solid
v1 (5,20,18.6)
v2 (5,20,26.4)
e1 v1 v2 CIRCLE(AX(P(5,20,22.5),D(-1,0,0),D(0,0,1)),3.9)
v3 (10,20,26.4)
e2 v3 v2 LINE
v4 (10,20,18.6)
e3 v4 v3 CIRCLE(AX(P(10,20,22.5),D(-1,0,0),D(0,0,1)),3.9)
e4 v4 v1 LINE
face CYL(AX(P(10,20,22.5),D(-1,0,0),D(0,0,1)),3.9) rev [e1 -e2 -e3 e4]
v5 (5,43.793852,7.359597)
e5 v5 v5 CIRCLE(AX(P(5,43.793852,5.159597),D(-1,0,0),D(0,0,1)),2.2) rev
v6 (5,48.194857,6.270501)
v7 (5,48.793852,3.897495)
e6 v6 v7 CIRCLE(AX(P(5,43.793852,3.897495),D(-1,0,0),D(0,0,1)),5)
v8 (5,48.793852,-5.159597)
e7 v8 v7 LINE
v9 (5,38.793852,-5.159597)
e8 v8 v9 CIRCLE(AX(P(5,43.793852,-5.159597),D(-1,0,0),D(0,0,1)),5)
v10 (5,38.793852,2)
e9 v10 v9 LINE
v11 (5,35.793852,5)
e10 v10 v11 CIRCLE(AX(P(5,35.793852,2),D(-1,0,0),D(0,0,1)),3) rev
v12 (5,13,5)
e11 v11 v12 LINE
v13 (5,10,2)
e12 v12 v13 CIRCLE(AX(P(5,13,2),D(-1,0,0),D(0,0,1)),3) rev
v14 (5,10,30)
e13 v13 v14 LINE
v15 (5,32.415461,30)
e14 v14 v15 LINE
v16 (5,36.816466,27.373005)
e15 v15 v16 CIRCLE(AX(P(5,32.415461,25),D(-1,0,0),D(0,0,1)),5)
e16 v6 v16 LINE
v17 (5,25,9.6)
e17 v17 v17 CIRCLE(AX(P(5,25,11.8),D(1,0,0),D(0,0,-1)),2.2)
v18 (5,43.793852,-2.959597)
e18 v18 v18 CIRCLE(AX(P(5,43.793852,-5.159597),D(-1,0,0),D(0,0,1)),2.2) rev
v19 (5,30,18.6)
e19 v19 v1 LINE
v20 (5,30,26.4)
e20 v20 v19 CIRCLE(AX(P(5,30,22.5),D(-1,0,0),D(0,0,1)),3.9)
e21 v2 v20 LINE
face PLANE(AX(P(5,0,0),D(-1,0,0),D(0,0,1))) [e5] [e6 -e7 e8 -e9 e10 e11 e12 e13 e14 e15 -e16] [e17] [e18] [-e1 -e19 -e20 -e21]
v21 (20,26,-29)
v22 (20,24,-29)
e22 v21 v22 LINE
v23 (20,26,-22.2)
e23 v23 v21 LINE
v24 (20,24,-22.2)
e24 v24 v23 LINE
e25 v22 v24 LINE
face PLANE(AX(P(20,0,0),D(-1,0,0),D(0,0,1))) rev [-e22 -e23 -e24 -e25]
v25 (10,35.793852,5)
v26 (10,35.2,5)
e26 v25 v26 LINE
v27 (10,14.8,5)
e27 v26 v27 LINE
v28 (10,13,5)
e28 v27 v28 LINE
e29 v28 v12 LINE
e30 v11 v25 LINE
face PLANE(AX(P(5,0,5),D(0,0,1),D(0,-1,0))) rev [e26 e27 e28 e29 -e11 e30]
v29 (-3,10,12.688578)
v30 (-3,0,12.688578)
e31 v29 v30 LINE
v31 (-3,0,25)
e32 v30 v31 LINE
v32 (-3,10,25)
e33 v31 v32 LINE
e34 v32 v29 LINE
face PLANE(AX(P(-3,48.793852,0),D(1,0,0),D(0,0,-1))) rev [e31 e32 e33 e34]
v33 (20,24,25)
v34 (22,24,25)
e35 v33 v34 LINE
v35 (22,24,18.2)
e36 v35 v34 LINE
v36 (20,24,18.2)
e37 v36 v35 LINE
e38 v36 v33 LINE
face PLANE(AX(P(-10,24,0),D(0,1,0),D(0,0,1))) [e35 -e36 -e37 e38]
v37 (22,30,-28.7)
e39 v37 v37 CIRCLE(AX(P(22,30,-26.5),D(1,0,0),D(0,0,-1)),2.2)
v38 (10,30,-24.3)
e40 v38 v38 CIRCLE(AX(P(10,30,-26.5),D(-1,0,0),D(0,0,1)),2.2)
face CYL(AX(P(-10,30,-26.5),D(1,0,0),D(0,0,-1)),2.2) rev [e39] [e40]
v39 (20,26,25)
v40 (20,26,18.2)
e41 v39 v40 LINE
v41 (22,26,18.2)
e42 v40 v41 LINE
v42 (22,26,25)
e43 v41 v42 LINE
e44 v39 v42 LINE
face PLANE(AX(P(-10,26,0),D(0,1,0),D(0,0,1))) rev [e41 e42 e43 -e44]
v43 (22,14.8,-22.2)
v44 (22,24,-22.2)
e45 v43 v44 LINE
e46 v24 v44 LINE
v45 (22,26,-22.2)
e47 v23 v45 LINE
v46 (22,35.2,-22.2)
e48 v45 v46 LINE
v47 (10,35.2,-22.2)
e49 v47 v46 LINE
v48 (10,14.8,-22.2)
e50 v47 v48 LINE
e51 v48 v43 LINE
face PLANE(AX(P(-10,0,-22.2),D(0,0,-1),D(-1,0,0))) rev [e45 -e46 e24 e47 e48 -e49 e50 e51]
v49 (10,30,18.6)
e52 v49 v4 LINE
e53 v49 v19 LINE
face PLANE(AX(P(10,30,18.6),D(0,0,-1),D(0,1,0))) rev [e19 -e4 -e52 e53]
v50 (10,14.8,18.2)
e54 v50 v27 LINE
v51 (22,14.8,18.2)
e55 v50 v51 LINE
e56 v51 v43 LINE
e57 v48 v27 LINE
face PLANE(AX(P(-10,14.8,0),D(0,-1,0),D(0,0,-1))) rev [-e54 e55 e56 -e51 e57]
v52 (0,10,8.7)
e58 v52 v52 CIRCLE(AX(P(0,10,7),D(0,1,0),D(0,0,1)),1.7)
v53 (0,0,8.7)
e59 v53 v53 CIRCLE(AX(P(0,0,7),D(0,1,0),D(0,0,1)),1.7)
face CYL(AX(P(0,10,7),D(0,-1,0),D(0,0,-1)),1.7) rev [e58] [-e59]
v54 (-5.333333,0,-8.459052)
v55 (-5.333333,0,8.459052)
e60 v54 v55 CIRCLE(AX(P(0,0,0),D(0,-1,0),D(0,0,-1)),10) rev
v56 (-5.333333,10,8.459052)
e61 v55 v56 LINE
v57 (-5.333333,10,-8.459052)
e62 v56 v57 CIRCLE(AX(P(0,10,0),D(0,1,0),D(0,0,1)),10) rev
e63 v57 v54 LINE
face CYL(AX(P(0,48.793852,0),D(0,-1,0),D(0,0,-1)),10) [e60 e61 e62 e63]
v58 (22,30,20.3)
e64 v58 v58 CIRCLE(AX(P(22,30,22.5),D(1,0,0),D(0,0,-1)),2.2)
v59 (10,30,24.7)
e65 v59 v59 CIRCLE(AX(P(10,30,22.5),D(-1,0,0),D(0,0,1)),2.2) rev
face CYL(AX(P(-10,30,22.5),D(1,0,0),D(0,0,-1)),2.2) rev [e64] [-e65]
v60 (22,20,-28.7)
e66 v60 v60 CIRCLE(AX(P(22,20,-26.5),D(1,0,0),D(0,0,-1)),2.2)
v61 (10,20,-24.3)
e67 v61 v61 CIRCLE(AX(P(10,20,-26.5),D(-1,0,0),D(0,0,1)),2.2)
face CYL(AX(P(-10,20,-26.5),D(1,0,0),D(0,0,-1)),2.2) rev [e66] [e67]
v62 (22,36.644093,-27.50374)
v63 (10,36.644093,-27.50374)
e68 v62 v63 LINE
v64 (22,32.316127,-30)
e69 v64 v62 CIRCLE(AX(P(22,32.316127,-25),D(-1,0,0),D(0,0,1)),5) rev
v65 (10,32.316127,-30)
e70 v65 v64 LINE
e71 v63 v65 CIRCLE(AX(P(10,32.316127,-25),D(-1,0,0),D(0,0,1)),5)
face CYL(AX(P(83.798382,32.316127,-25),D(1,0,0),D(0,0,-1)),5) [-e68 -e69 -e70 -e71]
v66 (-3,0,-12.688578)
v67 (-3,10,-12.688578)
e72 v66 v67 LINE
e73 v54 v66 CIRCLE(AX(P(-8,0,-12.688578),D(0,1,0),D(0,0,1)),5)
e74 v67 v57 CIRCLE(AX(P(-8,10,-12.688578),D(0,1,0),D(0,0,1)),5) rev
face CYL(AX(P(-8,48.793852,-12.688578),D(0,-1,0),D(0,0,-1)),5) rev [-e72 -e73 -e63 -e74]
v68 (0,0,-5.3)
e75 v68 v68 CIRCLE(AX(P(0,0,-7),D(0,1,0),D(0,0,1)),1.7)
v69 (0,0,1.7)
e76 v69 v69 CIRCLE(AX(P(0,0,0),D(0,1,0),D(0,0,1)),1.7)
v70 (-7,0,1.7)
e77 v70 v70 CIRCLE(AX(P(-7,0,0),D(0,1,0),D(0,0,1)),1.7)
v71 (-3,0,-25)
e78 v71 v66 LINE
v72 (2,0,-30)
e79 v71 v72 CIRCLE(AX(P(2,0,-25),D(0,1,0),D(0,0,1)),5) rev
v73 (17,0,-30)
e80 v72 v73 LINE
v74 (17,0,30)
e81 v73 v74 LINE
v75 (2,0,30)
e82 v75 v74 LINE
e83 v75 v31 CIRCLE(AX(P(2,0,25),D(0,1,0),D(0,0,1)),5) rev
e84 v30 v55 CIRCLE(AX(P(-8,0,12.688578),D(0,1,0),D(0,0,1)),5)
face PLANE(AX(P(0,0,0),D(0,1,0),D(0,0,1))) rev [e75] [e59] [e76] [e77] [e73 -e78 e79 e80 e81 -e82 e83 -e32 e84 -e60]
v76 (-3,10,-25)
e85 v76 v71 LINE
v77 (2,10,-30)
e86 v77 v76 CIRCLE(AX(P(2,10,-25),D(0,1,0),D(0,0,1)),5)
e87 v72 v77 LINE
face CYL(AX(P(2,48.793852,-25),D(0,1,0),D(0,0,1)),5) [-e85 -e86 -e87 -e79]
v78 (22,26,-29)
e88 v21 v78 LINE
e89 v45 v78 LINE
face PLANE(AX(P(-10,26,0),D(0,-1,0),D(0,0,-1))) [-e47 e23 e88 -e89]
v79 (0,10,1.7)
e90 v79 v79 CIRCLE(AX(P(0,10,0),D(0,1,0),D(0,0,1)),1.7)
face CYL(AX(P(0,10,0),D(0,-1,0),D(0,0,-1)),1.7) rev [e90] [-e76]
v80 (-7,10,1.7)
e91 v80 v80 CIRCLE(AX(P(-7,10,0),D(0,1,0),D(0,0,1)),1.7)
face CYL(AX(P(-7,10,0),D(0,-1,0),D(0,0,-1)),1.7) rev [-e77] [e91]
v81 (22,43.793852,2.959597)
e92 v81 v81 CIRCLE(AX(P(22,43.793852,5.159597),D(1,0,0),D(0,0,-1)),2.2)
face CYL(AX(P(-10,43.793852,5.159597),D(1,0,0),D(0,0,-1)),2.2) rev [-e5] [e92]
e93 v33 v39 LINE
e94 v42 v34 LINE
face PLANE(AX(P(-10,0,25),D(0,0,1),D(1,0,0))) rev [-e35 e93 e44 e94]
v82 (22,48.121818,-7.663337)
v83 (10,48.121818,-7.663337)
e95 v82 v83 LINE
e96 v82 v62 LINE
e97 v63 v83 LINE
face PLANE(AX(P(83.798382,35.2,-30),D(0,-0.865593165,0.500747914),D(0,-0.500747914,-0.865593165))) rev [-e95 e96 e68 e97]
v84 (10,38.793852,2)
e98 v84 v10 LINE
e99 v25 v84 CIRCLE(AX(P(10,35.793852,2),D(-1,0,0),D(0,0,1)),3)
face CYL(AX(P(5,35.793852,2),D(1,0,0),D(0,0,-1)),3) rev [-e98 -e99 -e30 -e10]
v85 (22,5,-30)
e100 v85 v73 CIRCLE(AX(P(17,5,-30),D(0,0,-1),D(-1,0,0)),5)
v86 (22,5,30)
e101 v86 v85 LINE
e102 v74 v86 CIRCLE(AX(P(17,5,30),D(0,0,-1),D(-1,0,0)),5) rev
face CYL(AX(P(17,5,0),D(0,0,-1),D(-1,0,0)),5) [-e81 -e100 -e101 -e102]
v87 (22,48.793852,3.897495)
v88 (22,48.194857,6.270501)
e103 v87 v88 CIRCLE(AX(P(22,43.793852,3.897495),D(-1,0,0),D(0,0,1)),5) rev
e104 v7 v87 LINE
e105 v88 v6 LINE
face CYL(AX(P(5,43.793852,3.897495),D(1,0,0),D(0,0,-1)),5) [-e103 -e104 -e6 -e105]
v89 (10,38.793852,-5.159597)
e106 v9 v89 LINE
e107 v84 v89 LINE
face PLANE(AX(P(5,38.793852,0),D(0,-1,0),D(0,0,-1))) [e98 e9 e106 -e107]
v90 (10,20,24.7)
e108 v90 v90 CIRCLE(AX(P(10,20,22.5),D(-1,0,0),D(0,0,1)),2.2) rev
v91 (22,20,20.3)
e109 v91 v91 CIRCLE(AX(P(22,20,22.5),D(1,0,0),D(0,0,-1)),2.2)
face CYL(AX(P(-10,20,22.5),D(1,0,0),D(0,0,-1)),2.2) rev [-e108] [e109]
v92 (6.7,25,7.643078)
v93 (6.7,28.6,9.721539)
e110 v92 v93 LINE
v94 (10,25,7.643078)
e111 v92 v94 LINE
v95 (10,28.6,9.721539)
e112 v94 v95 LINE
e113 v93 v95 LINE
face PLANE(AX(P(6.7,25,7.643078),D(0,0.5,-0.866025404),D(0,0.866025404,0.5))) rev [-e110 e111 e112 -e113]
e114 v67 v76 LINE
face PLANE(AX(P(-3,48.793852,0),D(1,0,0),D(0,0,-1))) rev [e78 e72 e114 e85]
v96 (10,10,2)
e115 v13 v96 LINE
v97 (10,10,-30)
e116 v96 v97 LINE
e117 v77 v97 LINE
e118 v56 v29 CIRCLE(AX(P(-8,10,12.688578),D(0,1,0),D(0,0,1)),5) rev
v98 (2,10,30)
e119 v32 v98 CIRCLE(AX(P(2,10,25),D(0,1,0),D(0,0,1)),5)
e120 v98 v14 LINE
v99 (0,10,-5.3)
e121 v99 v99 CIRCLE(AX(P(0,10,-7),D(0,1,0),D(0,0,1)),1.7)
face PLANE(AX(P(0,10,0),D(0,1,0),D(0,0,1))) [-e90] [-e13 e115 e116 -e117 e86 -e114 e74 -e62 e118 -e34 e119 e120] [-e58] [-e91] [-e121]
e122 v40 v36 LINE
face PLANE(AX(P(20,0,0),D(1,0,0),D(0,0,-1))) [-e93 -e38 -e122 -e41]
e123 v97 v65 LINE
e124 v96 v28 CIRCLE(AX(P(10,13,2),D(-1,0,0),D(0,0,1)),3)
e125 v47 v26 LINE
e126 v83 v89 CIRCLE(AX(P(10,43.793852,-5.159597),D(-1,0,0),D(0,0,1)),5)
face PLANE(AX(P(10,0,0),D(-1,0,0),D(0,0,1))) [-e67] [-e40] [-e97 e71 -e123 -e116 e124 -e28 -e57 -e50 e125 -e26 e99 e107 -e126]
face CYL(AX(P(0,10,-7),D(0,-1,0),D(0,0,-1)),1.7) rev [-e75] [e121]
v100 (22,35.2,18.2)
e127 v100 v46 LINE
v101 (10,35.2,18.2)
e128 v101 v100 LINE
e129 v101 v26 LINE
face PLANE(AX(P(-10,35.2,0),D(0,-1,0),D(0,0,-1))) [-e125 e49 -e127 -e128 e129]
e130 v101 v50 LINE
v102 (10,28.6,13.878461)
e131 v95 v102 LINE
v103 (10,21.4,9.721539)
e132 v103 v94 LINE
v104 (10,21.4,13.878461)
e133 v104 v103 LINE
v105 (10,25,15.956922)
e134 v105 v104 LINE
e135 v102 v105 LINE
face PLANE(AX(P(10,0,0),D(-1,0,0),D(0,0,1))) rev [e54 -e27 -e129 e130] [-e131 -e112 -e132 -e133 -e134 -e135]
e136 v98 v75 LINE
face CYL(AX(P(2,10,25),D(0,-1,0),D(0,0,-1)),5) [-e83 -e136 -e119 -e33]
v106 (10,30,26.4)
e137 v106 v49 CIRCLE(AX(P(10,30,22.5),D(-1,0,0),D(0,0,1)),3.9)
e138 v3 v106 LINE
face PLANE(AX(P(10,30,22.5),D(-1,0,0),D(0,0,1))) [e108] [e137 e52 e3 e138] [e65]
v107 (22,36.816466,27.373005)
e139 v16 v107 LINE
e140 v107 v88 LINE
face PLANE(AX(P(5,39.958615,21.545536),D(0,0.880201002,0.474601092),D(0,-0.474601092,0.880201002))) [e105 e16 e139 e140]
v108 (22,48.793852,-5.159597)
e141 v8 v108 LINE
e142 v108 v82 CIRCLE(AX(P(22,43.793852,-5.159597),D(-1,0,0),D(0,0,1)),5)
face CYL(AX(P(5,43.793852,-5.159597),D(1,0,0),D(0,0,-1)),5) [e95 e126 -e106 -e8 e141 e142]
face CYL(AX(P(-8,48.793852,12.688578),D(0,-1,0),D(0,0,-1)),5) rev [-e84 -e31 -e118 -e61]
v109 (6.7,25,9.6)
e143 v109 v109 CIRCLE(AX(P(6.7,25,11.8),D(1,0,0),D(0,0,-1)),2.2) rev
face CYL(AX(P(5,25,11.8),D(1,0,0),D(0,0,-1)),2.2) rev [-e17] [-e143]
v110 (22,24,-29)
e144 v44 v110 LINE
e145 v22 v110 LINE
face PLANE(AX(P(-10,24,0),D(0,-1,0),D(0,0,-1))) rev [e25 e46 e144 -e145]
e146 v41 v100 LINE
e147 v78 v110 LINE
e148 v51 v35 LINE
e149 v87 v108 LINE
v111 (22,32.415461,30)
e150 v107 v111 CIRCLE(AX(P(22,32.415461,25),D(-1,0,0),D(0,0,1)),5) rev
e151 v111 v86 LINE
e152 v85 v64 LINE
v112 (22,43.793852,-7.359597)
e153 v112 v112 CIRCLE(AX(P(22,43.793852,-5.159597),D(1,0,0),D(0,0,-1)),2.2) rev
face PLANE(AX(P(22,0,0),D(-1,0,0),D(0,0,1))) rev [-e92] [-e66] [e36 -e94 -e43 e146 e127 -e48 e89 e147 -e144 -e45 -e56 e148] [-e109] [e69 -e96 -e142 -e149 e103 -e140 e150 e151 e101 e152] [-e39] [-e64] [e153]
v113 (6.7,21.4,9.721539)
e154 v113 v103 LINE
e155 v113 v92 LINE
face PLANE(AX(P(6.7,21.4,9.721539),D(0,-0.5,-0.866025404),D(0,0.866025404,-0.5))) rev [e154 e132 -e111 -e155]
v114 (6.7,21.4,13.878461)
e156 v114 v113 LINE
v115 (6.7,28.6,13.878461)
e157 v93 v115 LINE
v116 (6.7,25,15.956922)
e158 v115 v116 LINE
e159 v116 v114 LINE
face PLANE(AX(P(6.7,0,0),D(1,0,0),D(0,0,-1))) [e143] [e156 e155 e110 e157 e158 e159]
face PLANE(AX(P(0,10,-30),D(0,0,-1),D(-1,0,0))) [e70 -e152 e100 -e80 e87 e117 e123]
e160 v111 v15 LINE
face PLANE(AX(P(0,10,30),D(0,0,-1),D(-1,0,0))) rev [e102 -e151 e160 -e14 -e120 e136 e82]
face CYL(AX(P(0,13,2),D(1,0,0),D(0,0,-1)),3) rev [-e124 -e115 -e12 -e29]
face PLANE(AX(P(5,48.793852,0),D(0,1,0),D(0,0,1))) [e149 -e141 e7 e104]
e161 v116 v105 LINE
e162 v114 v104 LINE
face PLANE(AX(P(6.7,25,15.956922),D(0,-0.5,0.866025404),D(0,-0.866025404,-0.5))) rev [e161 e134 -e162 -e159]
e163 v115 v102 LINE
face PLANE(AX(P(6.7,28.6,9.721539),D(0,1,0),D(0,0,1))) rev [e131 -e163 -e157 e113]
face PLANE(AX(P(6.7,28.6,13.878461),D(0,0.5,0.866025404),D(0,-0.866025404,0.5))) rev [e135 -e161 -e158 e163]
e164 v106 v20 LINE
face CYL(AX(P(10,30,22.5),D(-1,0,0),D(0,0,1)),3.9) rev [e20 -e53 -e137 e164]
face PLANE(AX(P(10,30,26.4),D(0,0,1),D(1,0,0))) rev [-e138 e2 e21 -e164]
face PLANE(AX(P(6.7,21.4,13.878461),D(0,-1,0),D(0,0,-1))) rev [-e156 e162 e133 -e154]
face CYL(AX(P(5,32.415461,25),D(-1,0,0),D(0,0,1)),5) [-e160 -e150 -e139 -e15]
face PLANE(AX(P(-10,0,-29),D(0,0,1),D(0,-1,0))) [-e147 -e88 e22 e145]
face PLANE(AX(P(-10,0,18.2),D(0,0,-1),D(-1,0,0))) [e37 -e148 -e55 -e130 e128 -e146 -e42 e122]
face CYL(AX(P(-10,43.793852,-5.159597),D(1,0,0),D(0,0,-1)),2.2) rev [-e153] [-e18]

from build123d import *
from build123d.topology import SkipClean

# Parameters (mm, degrees)
SKETCH_1_W           = 20
SKETCH_1_H           = 60.00000000000001
SKETCH_1_R           = 1.7000000000000004
SKETCH_1_R_2         = 1.7
EXTRUDE_1_DEPTH      = 10
SKETCH_6_W           = 60.00000000000001
SKETCH_6_H           = 50.00000000000001
EXTRUDE_4_DEPTH      = 12
SKETCH_7_R           = 2.200000000000002
SKETCH_7_R_2         = 2.2
CUT_EXTRUDE_3_DEPTH  = 67.51315659326356
EXTRUDE_5_OUTLINE_R  = 2.2
EXTRUDE_5_DEPTH      = 5
CUT_EXTRUDE_7_DEPTH  = 5
SKETCH_14_R          = 2.2
CUT_EXTRUDE_8_DEPTH  = 5
CUT_EXTRUDE_START    = -17
CUT_EXTRUDE_9_DEPTH  = 17
SKETCH_18_W          = 6.800000000000008
SKETCH_18_H          = 2.000000000000014
SKETCH_18_W_2        = 6.799999999999994
SKETCH_18_H_2        = 2.0000000000000036
EXTRUDE_10_DEPTH     = 10
CUT_EXTRUDE_10_DEPTH = 62.35829229692095
CUT_EXTRUDE_11_DEPTH = 3.3
FILLET_1_R           = 5
FILLET_2_R           = 3


# Read off the part's stored shape, not the designer's step: 凸台-拉伸5
with BuildPart() as part:
    # 草图1 → 凸台-拉伸1 (new body)
    with BuildSketch(Plane(origin=(0, 0, 0), x_dir=(1, 0, 0), z_dir=(0, 1, 0))):
        Rectangle(SKETCH_1_W, SKETCH_1_H)
        with Locations(Location((-7.000000000000025, 5.2e-15, 0), (0, 0, 270))):
            Circle(SKETCH_1_R, mode=Mode.SUBTRACT)
        with Locations(Location((-2.429e-14, 5.2e-15, 0), (0, 0, 270))):
            Circle(SKETCH_1_R_2, mode=Mode.SUBTRACT)
        with Locations(Location((2.949e-14, 7.000000000000025, 0), (0, 0, 270))):
            Circle(SKETCH_1_R, mode=Mode.SUBTRACT)
        with Locations(Location((-4.48e-15, -7.000000000000048, 0), (0, 0, 270))):
            Circle(SKETCH_1_R, mode=Mode.SUBTRACT)
    extrude(amount=EXTRUDE_1_DEPTH)

    # 草图6 → 凸台-拉伸4 (add)
    with BuildSketch(Plane(origin=(10, 0, 0), x_dir=(0, 0, -1), z_dir=(1, 0, 0))):
        with Locations((0, 25.000000000000004)):
            Rectangle(SKETCH_6_W, SKETCH_6_H)
    extrude(amount=EXTRUDE_4_DEPTH)

    # 草图7 → 切除-拉伸3 (cut, through all)
    with BuildSketch(Plane(origin=(22, 0, 0), x_dir=(0, 0, -1), z_dir=(1, 0, 0))):
        with Locations((-22.500000000000014, 30)):
            Circle(SKETCH_7_R)
        with Locations((-22.500000000000014, 20)):
            Circle(SKETCH_7_R)
        Polygon((-18.20000000000001, 14.8), (22.199999999999985, 14.800000000000002), (22.199999999999985, 35.2), (-18.20000000000001, 35.2), align=None)
        with Locations((26.49999999999999, 30.000000000000007)):
            Circle(SKETCH_7_R)
        with Locations((26.49999999999999, 20.000000000000004)):
            Circle(SKETCH_7_R)
        Polygon((22.199999999999985, 26.00000000000001), (22.199999999999985, 23.999999999999996), (28.999999999999986, 24.000000000000004), (28.99999999999999, 26.00000000000001), align=None)
        Polygon((-25.000000000000014, 24), (-18.200000000000014, 24), (-18.20000000000001, 26.000000000000004), (-25.000000000000014, 26.000000000000004), align=None)
        with Locations((-5.159597133486693, 43.79385241571819)):
            Circle(SKETCH_7_R_2)
        with Locations((5.159597133486693, 43.79385241571819)):
            Circle(SKETCH_7_R_2)
    extrude(amount=-CUT_EXTRUDE_3_DEPTH, mode=Mode.SUBTRACT)

    # 凸台-拉伸5 outline → 凸台-拉伸5 (add)
    with SkipClean():  # the faces are left unmerged after this step: merging them gives an invalid solid
        with BuildSketch(Plane.ZY.offset(-10)):
            with BuildLine():
                Line((30, 10), (30, 35.4))
                Line((30, 35.4), (5.159597133, 48.793852416))
                Line((5.159597133, 48.793852416), (-5.159597133, 48.793852416))
                ThreePointArc((-5.159597133, 48.793852416), (-10.159597133, 43.793852416), (-5.159597133, 38.793852416))
                Line((-5.159597133, 38.793852416), (5, 38.793852416))
                Line((5, 38.793852416), (5, 10))
                Line((5, 10), (30, 10))
            make_face()
            with Locations((22.5, 20)):
                Circle(EXTRUDE_5_OUTLINE_R, mode=Mode.SUBTRACT)
            with Locations((-5.159597133, 43.793852416)):
                Circle(EXTRUDE_5_OUTLINE_R, mode=Mode.SUBTRACT)
            with Locations((5.159597133, 43.793852416)):
                Circle(EXTRUDE_5_OUTLINE_R, mode=Mode.SUBTRACT)
            with Locations((22.5, 30)):
                Circle(EXTRUDE_5_OUTLINE_R, mode=Mode.SUBTRACT)
        extrude(amount=EXTRUDE_5_DEPTH)

    # 草图13 → 切除-拉伸7 (cut)
    with BuildSketch(Plane.ZY.offset(-5)):
        with BuildLine():
            Line((26.400000000000016, 30), (26.400000000000016, 20))
            ThreePointArc((26.400000000000016, 20), (22.500000000000014, 16.099999999999998), (18.600000000000012, 20))
            Line((18.600000000000012, 20), (18.60000000000001, 30))
            ThreePointArc((18.60000000000001, 30), (22.500000000000014, 33.900000000000006), (26.400000000000016, 30))
        make_face()
    extrude(amount=-CUT_EXTRUDE_7_DEPTH, mode=Mode.SUBTRACT)

    # 草图14 → 切除-拉伸8 (cut)
    with BuildSketch(Plane(origin=(10, 0, 0), x_dir=(0, 0, -1), z_dir=(1, 0, 0))):
        with Locations((-11.800000000000018, 25)):
            Circle(SKETCH_14_R)
    extrude(amount=-CUT_EXTRUDE_8_DEPTH, mode=Mode.SUBTRACT)

    # 草图16 → 切除-拉伸9 (cut)
    with BuildSketch(Plane.ZY.offset(-5).offset(CUT_EXTRUDE_START)):
        with BuildLine():
            Line((5.159597133486693, 48.793852415718185), (30, 35.40000000000001))
            Line((30, 35.40000000000001), (30, 50))
            Line((30, 50), (-30, 50))
            Line((-30, 50), (-29.999999999999996, 35.2))
            Line((-29.999999999999996, 35.2), (-7.663336701878596, 48.121818239713186))
            ThreePointArc((-7.663336701878596, 48.121818239713186), (-6.455778231949604, 48.622922156360524), (-5.1595971334867095, 48.793852415718185))
            Line((-5.1595971334867095, 48.793852415718185), (5.159597133486693, 48.793852415718185))
        make_face()
    extrude(amount=CUT_EXTRUDE_9_DEPTH, mode=Mode.SUBTRACT)

    # 草图18 → 凸台-拉伸10 (add)
    with BuildSketch(Plane.ZY.offset(-10)):
        with Locations((-25.599999999999987, 25.000000000000004)):
            Rectangle(SKETCH_18_W, SKETCH_18_H)
        with Locations((21.60000000000001, 25)):
            Rectangle(SKETCH_18_W_2, SKETCH_18_H_2)
    extrude(amount=-EXTRUDE_10_DEPTH)

    # 草图19 → 切除-拉伸10 (cut, through all)
    with BuildSketch(Plane.XZ):
        with BuildLine():
            Line((-3.0000000000000244, 9.539392014169463), (-3.0000000000000244, 30))
            Line((-3.0000000000000244, 30), (-10, 30))
            Line((-10, 30), (-10, -1.2700383e-09))
            ThreePointArc((-10.000000000000028, -1.27003874e-09), (-8.06225774867426, 5.916079782587651), (-3.000000000000024, 9.539392014169465))
        make_face()
        with BuildLine():
            ThreePointArc((-3.0000000000000244, -9.539392014169461), (-8.062257747922892, -5.916079783611588), (-10.000000000000028, -1.27003874e-09))
            Line((-10, -1.2700383e-09), (-10, -30))
            Line((-10, -30), (-3.000000000000025, -30))
            Line((-3.0000000000000244, -30), (-3.0000000000000244, -9.539392014169465))
        make_face()
    extrude(amount=-CUT_EXTRUDE_10_DEPTH, mode=Mode.SUBTRACT)

    # 草图20 → 切除-拉伸11 (cut)
    with BuildSketch(Plane(origin=(10, 0, 0), x_dir=(0, 0, -1), z_dir=(1, 0, 0))):
        Polygon((-7.643078061834704, 24.999999999999993), (-9.721539030917363, 28.600000000000012), (-13.878460969082674, 28.600000000000012), (-15.956921938165337, 24.999999999999993), (-13.878460969082676, 21.399999999999984), (-9.721539030917361, 21.399999999999984), align=None)
    extrude(amount=-CUT_EXTRUDE_11_DEPTH, mode=Mode.SUBTRACT)

    # 圆角1
    fillet_1_edges = [part.edges().sort_by_distance(p)[0] for p in [
        (13.5, 35.400000000000006, 30),
        (16, 48.793852415718185, 5.159597133486693),
        (16, 35.2, -29.999999999999996),
        (-3.0000000000000244, 5, 30),
        (-3.000000000000024, 5, 9.539392014169465),
        (-3.000000000000025, 5, -30),
        (-3.000000000000025, 5, -9.539392014169465),
        (22, 0, 0),
    ]]
    fillet(fillet_1_edges, radius=FILLET_1_R)

    # 圆角2
    fillet_2_edges = [part.edges().sort_by_distance(p)[0] for p in [
        (7.5, 38.793852416, 5),
        (7.5, 10, 5),
    ]]
    fillet(fillet_2_edges, radius=FILLET_2_R)


solid = part.part
